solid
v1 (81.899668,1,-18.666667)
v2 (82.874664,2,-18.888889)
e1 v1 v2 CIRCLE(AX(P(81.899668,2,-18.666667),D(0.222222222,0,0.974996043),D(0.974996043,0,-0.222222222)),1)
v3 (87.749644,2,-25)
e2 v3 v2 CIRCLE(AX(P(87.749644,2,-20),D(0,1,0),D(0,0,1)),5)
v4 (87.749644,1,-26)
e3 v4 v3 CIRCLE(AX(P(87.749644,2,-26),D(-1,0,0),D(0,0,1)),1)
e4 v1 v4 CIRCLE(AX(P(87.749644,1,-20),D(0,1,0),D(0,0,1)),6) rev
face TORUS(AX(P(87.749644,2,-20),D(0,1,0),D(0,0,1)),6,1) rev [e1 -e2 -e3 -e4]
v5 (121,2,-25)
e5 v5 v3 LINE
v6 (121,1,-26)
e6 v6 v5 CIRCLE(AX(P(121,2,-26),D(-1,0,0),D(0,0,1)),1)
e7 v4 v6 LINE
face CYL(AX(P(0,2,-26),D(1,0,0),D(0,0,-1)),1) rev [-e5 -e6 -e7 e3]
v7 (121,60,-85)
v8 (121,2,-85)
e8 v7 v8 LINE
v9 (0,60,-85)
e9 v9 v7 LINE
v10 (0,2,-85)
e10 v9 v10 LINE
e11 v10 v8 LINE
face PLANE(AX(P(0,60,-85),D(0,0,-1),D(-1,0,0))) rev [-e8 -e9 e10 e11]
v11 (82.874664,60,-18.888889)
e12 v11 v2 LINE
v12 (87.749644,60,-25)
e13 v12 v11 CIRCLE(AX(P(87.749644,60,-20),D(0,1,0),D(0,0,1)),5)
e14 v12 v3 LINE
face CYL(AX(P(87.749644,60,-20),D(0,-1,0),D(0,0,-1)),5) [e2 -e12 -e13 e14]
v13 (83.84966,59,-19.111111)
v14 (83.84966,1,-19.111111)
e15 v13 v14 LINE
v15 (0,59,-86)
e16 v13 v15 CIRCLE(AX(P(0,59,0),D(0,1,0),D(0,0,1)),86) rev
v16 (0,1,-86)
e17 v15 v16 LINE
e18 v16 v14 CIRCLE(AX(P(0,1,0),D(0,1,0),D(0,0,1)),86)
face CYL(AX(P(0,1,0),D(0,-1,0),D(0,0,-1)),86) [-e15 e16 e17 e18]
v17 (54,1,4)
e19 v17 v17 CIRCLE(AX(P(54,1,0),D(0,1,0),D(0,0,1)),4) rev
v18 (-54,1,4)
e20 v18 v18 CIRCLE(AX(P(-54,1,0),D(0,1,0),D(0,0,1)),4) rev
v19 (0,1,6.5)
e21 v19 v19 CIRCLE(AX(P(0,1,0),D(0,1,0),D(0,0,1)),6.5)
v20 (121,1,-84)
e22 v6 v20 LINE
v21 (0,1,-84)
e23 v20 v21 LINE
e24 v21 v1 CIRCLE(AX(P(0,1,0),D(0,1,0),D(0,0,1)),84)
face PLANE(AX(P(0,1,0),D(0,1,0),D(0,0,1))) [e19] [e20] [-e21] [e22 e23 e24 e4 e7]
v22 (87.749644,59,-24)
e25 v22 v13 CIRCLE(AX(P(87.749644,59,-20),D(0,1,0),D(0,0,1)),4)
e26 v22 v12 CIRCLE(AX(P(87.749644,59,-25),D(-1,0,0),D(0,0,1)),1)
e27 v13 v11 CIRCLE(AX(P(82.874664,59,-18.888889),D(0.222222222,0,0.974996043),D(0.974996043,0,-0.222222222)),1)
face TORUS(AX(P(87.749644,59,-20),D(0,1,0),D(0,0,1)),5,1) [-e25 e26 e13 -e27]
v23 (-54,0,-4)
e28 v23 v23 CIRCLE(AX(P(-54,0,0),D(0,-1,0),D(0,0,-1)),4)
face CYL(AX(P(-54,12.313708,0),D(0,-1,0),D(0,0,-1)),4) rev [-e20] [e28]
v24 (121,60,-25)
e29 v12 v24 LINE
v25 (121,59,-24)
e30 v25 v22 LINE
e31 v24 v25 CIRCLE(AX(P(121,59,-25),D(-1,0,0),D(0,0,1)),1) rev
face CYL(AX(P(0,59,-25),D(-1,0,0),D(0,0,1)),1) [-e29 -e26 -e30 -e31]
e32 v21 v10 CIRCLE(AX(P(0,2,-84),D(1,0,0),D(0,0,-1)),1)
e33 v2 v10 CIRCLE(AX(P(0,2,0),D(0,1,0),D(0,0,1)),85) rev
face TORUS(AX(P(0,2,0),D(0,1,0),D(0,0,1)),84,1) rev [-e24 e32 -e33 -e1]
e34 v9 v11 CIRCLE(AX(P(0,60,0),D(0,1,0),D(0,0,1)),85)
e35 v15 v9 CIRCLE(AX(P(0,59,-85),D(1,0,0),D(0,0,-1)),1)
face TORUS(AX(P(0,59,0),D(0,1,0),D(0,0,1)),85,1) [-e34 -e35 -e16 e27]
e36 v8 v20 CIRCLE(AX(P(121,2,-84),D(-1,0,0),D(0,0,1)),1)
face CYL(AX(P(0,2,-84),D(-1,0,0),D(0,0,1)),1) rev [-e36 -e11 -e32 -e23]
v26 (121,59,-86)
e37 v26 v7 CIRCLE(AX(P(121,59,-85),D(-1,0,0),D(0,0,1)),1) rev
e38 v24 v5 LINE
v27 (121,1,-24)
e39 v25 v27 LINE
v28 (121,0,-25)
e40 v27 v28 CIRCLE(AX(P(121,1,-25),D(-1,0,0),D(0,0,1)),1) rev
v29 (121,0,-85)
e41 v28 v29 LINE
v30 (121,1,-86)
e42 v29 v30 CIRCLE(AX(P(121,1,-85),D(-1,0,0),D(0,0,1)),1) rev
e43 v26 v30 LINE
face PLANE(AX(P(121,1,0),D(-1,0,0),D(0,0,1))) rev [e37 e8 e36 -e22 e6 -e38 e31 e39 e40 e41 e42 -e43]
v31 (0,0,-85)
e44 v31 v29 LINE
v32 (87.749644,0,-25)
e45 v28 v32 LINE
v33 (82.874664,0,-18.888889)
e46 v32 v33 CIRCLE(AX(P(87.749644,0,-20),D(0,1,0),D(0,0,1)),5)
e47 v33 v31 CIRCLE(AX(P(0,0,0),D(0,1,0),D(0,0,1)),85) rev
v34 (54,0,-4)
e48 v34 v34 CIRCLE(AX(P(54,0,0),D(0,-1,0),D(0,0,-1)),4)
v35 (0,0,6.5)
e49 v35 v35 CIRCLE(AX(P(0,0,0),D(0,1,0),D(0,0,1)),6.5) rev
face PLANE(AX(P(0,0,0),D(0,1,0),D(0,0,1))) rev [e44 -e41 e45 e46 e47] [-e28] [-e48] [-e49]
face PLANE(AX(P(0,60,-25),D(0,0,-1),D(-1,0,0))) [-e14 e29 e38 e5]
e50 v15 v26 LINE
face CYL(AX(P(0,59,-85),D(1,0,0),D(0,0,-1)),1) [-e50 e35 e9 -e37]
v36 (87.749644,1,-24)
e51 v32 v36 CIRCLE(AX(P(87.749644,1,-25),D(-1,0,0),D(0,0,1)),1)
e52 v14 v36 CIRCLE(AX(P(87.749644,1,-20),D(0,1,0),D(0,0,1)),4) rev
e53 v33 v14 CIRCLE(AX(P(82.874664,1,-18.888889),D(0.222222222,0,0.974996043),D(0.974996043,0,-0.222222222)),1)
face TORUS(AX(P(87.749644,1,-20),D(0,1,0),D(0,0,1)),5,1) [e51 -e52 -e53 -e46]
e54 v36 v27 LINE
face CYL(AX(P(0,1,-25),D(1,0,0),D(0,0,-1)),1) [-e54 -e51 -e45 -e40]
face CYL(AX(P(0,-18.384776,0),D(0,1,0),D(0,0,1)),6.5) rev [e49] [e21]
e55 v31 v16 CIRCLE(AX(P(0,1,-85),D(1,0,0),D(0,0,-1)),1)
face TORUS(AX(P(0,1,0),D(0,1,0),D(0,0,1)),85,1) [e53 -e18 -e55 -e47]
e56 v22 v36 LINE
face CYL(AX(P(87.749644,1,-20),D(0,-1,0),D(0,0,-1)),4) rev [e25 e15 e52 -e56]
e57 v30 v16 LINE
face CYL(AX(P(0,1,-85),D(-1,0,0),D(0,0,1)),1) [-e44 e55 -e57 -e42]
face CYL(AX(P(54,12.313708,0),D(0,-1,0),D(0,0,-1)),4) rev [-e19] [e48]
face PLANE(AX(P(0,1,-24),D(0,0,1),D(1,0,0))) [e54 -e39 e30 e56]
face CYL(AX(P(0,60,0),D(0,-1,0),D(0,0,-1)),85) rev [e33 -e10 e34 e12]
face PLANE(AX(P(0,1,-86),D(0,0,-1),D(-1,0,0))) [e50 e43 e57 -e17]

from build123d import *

# Parameters (mm, degrees)
BOSS_EXTRUDE1_DEPTH = 1
BOSS_EXTRUDE2_DEPTH = 60
SKETCH2_R           = 6.5
CUT_EXTRUDE1_DEPTH  = 1
FILLET1_R           = 1
SKETCH3_R           = 4
CUT_EXTRUDE2_DEPTH  = 1


with BuildPart() as part:
    # Sketch1 → Boss-Extrude1 (new body)
    with BuildSketch(Plane(origin=(0, 0, 0), x_dir=(1, 0, 0), z_dir=(0, 1, 0))):
        with BuildLine():
            Line((121, 24), (121, 86))
            Line((121, 86), (0, 86))
            ThreePointArc((0, 86), (-53.630422544, -67.229292557), (83.849659702, 19.111111111))
            ThreePointArc((83.849659702, 19.111111111), (84.622700034, 22.494438258), (87.749643874, 24))
            Line((87.749643874, 24), (121, 24))
        make_face()
    extrude(amount=BOSS_EXTRUDE1_DEPTH)

    # Sketch1<3> → Boss-Extrude2 (add)
    with BuildSketch(Plane(origin=(0, 0, 0), x_dir=(1, 0, 0), z_dir=(0, 1, 0))):
        with BuildLine():
            ThreePointArc((87.749643874, 24), (84.622700034, 22.494438258), (83.849659702, 19.111111111))
            ThreePointArc((83.849659702, 19.111111111), (-53.630422544, -67.229292557), (0, 86))
            Line((0, 86), (121, 86))
            Line((121, 86), (121, 85))
            Line((121, 85), (120, 85))
            Line((120, 85), (0, 85))
            ThreePointArc((0, 85), (-53.006812979, -66.447556597), (82.874663659, 18.888888889))
            ThreePointArc((82.874663659, 18.888888889), (83.840964074, 23.118047822), (87.749643874, 25))
            Line((87.749643874, 25), (120, 25))
            Line((120, 25), (121, 25))
            Line((121, 25), (121, 24))
            Line((121, 24), (87.749643874, 24))
        make_face()
    extrude(amount=BOSS_EXTRUDE2_DEPTH)

    # Sketch2 → Cut-Extrude1 (cut)
    with BuildSketch(Plane(origin=(0, 1, 0), x_dir=(1, 0, 0), z_dir=(0, 1, 0))):
        with Locations(Location((0, 0, 0), (0, 0, 270))):
            Circle(SKETCH2_R)
    extrude(amount=-CUT_EXTRUDE1_DEPTH, mode=Mode.SUBTRACT)

    # Fillet1
    fillet1_edges = [part.edges().sort_by_distance(p)[0] for p in [
        (104.374821937, 1, -25),
        (83.840964074, 1, -23.118047822),
        (60.5, 1, -85),
        (60.5, 0, -86),
        (104.374821937, 0, -24),
        (84.622700034, 0, -22.494438258),
        (60.5, 60, -86),
        (104.374821937, 60, -24),
        (84.622700034, 60, -22.494438258),
        (-53.006812979, 1, 66.447556597),
        (-53.630422544, 0, 67.229292557),
        (-53.630422544, 60, 67.229292557),
    ]]
    fillet(fillet1_edges, radius=FILLET1_R - 0.0001)  # a hair under: the kernel refuses the full size

    # Sketch3 → Cut-Extrude2 (cut)
    with BuildSketch(Plane.XZ):
        with Locations(Location((-54, 0, 0), (0, 0, 270))):
            Circle(SKETCH3_R)
        with Locations(Location((54, 0, 0), (0, 0, 270))):
            Circle(SKETCH3_R)
    extrude(amount=-CUT_EXTRUDE2_DEPTH, mode=Mode.SUBTRACT)


solid = part.part
